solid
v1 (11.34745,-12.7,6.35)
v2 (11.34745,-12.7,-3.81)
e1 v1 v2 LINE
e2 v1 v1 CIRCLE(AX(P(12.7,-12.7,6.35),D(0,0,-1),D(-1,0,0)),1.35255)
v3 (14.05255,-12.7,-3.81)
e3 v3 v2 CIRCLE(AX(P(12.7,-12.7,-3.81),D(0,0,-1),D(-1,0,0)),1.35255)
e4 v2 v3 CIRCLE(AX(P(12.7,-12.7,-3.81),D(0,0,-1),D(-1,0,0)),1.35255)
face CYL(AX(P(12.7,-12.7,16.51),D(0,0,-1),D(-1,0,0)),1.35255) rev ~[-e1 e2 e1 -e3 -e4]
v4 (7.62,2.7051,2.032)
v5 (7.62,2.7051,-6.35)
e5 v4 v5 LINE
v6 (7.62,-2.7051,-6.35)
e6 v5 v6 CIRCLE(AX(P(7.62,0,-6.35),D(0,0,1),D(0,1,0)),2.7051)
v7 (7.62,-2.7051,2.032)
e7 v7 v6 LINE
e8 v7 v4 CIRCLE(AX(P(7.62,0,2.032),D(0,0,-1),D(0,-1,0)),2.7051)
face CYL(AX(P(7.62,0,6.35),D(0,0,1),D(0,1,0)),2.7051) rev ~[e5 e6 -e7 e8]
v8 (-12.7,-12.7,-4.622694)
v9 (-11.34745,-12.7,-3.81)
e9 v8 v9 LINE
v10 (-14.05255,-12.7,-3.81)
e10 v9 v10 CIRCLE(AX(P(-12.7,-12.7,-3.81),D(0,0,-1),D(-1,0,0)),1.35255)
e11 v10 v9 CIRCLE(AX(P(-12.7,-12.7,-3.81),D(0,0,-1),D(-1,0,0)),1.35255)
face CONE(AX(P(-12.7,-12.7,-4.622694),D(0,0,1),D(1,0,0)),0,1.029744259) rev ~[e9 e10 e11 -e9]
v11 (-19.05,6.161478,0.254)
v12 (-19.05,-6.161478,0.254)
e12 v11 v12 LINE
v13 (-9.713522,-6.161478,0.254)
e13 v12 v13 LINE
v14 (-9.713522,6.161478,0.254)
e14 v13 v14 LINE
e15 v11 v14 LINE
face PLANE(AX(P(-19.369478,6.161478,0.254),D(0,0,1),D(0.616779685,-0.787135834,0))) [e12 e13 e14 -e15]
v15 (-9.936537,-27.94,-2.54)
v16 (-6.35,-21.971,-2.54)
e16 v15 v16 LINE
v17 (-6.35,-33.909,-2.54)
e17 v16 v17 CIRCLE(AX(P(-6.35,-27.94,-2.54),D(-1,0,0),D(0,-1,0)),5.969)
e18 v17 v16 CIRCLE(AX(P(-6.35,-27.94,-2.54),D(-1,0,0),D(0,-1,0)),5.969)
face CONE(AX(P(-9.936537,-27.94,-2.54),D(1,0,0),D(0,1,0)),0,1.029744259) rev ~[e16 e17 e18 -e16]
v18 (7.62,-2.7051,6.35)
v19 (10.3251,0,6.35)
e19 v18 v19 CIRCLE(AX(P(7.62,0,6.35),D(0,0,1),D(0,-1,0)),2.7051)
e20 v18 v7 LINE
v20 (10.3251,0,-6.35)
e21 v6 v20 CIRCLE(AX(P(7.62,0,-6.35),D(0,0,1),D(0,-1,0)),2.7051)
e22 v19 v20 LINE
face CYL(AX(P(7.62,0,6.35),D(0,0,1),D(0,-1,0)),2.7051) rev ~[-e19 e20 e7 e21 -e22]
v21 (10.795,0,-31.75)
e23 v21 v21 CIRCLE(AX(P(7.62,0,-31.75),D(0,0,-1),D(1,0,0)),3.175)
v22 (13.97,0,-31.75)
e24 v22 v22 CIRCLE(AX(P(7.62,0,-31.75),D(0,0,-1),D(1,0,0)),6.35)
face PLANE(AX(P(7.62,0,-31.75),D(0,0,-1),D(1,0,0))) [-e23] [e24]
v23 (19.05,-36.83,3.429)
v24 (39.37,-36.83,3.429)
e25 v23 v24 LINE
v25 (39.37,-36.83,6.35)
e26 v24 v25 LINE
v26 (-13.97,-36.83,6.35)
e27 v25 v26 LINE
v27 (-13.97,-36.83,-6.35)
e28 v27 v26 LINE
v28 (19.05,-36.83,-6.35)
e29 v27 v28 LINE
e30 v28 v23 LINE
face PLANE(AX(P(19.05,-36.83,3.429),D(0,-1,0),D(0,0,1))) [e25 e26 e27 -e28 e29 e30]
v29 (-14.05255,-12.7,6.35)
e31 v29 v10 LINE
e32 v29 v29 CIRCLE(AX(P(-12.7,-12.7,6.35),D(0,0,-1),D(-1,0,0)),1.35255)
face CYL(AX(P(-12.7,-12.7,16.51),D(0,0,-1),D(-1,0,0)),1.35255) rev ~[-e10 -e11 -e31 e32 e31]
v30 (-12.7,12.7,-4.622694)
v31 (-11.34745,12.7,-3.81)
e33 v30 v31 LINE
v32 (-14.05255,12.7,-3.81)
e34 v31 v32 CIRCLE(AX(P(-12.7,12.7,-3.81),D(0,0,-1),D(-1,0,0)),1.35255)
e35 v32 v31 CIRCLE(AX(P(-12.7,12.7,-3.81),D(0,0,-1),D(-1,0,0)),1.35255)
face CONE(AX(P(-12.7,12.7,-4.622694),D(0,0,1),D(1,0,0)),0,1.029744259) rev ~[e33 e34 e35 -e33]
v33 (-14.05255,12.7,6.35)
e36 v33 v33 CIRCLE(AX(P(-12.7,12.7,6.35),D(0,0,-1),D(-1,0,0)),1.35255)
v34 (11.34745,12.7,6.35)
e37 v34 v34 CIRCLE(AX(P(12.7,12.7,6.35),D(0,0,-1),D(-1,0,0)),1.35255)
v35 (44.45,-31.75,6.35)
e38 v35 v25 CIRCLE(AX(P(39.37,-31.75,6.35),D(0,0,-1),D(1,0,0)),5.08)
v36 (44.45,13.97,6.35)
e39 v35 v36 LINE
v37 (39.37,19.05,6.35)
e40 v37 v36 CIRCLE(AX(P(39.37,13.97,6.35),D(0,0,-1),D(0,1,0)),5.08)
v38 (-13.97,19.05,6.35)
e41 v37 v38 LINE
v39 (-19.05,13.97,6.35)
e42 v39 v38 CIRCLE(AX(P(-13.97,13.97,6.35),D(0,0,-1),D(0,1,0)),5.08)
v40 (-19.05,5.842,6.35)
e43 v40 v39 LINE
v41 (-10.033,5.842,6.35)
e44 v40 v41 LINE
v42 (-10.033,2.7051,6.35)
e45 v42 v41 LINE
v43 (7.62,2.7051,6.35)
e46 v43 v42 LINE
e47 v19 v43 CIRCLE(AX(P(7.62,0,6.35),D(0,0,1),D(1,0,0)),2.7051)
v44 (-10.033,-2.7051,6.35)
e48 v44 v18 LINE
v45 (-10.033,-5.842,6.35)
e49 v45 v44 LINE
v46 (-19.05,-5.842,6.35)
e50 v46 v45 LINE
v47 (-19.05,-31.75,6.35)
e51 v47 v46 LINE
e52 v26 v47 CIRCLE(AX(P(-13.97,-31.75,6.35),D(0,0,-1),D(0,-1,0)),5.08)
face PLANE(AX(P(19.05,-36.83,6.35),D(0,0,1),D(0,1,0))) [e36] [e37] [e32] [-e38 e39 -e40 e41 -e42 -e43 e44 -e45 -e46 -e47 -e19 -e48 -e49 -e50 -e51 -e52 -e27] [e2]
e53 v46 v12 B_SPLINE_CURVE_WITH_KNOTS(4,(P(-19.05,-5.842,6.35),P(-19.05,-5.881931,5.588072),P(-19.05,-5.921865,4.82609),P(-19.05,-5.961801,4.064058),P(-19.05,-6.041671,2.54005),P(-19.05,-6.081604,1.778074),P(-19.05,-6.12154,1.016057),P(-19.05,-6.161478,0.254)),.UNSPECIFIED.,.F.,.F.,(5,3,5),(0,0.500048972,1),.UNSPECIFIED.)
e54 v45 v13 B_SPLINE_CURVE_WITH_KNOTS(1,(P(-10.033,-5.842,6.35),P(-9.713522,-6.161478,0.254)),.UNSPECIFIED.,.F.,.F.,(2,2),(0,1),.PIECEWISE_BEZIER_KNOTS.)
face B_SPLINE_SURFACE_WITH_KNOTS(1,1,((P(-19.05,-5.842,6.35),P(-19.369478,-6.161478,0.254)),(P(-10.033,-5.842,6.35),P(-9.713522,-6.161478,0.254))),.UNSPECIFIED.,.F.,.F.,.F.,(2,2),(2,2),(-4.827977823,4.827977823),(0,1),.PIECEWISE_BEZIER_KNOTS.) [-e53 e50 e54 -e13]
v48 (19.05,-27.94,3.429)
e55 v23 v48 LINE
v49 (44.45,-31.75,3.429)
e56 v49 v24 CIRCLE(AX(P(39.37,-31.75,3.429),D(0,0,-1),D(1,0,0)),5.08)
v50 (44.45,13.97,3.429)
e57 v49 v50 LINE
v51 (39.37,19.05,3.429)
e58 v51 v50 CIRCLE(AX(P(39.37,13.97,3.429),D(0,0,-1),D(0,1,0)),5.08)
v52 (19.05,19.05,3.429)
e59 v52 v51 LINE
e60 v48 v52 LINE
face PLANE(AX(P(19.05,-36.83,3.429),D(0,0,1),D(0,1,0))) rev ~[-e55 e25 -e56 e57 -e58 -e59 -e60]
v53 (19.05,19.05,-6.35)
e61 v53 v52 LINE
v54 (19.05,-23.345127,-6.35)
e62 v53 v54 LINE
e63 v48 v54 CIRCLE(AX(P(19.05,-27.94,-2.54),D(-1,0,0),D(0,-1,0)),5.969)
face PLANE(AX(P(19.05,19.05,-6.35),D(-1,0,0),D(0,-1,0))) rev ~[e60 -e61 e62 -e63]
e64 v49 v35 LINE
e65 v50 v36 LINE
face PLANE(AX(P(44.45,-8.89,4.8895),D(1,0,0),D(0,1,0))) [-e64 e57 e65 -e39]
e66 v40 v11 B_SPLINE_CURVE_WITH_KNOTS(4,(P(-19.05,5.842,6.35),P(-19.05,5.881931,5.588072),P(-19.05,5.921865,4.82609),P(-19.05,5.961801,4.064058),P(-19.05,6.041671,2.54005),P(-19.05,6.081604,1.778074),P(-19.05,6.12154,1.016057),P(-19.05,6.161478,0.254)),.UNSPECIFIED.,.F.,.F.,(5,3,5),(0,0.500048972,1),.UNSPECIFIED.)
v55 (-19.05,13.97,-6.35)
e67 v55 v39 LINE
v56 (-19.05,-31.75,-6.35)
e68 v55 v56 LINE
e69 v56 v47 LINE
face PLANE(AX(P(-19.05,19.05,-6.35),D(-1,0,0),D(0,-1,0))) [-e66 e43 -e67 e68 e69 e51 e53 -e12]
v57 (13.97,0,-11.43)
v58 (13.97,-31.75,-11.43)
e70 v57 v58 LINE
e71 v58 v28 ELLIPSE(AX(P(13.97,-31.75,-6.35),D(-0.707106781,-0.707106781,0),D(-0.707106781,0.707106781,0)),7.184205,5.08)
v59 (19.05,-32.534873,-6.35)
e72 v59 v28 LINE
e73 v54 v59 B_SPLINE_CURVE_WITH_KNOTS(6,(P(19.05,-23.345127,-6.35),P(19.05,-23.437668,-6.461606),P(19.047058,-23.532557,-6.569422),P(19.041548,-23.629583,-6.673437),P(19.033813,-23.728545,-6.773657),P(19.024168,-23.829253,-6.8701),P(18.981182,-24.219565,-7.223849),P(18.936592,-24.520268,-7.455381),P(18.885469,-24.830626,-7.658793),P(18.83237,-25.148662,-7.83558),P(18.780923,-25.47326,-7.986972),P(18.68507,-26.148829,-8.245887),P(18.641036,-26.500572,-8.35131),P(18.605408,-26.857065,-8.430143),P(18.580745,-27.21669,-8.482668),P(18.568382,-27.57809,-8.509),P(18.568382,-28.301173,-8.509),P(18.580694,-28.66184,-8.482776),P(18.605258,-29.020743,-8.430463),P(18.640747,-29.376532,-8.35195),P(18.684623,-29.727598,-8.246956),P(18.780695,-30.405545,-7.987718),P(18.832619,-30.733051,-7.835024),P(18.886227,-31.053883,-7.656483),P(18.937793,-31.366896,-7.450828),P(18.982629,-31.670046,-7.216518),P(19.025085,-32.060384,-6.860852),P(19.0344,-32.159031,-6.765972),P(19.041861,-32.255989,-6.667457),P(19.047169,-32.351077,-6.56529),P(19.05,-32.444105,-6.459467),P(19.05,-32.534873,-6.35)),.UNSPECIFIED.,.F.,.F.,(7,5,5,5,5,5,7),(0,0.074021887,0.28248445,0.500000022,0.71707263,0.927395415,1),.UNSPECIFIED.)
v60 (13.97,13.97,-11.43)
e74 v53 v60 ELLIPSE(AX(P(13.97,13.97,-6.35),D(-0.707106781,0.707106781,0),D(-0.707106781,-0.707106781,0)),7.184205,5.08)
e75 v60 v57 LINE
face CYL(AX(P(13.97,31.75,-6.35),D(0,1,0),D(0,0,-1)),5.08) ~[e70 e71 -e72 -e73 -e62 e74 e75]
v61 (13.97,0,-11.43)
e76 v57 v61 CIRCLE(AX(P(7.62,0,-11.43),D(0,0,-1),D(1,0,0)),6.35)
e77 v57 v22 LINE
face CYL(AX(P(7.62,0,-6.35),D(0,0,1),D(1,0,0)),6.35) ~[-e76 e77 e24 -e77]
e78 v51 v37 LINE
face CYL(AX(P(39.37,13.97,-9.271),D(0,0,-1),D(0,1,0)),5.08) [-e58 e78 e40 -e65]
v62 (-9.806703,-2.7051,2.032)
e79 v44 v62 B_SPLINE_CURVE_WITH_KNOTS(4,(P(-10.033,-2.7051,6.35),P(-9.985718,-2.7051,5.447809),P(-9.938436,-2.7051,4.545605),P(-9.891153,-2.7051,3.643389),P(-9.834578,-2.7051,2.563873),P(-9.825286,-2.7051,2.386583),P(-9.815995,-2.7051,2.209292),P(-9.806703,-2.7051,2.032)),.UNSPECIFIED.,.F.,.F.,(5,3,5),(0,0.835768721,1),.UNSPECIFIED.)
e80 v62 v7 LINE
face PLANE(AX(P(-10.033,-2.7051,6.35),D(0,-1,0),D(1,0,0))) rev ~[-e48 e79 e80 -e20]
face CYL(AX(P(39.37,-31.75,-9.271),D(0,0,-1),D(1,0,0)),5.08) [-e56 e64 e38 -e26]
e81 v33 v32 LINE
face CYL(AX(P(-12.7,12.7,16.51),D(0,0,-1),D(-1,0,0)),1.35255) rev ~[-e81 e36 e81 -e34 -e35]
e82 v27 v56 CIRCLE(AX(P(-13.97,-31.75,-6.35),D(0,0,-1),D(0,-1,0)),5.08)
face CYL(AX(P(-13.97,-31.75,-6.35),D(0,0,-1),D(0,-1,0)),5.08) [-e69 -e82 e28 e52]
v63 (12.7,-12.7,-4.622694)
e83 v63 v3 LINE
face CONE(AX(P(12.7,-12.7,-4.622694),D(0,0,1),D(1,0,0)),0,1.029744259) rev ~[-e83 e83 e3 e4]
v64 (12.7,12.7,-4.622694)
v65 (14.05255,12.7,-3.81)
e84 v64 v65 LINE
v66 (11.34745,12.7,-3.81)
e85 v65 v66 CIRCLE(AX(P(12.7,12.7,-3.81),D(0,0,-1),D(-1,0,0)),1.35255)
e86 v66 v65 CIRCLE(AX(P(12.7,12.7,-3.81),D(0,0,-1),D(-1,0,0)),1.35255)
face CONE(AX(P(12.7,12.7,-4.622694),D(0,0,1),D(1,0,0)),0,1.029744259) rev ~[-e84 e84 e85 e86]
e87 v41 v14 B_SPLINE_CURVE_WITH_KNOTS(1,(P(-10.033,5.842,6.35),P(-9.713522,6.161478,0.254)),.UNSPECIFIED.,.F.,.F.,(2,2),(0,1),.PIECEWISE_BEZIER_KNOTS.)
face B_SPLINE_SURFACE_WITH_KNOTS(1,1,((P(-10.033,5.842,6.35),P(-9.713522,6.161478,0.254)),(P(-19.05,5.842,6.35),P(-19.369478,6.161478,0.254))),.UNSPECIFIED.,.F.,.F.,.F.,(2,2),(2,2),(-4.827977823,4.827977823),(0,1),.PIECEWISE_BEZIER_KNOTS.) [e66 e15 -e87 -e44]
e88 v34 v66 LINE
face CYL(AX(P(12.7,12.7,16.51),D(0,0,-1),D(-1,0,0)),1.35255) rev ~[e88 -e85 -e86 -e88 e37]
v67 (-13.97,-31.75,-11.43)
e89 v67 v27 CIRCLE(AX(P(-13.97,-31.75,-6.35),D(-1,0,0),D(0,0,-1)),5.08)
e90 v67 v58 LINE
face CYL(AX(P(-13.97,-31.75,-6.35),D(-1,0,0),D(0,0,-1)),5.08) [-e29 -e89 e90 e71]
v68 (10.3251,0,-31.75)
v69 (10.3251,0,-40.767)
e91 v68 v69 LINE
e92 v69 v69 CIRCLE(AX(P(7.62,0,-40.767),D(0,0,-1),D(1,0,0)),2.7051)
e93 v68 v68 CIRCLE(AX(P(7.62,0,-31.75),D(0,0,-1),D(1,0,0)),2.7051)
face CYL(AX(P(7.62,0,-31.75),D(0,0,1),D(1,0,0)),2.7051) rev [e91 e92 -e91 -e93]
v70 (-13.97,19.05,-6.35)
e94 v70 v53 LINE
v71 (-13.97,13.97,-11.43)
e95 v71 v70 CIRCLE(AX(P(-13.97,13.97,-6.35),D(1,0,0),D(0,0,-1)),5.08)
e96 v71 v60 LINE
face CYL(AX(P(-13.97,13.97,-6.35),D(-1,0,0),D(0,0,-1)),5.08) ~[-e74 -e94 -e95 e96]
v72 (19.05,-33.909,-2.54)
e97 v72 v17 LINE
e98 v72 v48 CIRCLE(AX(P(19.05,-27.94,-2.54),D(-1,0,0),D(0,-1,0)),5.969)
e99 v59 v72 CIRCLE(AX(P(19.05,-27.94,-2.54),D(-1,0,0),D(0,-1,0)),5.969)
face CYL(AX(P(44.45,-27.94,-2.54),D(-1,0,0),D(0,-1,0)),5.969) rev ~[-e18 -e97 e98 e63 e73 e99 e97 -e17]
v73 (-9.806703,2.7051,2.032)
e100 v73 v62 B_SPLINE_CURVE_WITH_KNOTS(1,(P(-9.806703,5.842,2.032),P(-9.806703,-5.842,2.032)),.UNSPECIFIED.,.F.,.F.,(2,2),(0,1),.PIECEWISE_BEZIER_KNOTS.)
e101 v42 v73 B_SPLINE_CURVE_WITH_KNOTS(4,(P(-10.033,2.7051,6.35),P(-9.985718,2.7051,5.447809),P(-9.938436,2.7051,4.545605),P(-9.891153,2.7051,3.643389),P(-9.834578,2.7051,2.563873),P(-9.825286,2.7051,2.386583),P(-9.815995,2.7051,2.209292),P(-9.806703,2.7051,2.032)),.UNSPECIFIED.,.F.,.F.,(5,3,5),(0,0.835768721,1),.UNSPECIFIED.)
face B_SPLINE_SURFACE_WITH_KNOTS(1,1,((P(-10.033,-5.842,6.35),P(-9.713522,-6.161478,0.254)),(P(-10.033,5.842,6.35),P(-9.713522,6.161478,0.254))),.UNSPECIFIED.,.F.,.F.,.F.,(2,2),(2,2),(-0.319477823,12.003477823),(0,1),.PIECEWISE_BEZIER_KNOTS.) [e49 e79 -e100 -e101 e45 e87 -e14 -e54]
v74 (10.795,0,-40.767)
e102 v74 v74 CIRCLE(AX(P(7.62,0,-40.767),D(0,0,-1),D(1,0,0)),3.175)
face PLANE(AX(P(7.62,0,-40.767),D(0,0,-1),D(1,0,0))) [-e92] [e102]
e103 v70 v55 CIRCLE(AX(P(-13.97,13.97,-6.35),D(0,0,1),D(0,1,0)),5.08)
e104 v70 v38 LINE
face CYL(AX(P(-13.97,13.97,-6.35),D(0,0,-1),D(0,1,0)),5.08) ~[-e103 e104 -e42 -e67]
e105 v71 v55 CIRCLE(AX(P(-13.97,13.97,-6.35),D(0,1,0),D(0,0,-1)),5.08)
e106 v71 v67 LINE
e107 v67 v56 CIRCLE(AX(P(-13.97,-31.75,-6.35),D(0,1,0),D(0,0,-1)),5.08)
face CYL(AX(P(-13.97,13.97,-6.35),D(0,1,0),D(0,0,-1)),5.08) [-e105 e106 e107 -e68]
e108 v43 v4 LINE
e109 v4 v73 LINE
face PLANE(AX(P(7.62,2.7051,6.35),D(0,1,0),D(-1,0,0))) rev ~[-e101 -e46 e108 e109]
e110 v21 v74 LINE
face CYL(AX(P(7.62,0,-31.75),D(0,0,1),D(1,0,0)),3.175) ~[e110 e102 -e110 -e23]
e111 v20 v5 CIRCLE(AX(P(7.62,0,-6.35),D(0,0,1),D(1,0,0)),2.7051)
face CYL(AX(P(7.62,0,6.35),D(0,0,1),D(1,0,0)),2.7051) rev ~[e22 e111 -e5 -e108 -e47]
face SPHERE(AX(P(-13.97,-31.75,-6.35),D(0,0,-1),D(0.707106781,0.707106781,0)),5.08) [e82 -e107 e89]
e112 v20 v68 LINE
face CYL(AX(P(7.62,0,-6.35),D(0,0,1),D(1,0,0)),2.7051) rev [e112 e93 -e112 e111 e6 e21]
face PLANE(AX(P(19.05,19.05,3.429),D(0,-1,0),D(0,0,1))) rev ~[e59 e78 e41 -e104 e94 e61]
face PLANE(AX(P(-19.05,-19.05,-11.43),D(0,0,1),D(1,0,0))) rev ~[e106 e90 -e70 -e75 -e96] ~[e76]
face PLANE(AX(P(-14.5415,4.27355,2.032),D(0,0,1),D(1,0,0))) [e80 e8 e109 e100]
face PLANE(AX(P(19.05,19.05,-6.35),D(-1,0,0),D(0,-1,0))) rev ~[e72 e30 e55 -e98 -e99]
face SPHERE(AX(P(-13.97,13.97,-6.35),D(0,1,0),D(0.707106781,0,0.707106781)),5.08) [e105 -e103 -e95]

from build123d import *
from build123d import SkipClean  # not in build123d's __all__

# Parameters (mm, degrees)
F0_W          = 38.1
F0_H          = 12.7
F1_DEPTH      = 19.05
F2_W          = 9.017
F2_H          = 3.1369
F2_H_2        = 5.4102
F3_DEPTH      = 6.096
F3_TAPER      = -3
F4_DEPTH      = 4.318
F5_DEPTH      = 12.7010001
F7_R          = 6.35
F7_R_2        = 2.7051
F8_DEPTH      = 25.4
F9_R          = 3.175
F9_R_2        = 2.7051
F10_DEPTH     = 9.017
F11_DEPTH     = 17.78
F12_DEPTH     = 5.08
F14_D         = 11.938
F14_DEPTH     = 25.4
F14_TIP       = 3.586537035
F15_W         = 55.88
F15_H         = 2.921
F16_DEPTH     = 25.4
F17_T1_DEPTH  = 25.4
F17_T3_DEPTH  = 28.321
F17_T5_DEPTH  = 45.72
F17_T7_DEPTH  = 45.72
F17_T9_DEPTH  = 81.28
F17_S13_W     = 5.08
F17_S13_H     = 5.08
F17_T14_DEPTH = 5.08
F17_S19_W     = 5.08
F17_S19_H     = 5.08
F17_T20_DEPTH = 5.08
F18_D         = 2.7051
F18_DEPTH     = 10.16
F18_TIP       = 0.8126940303


# Not quite as in the source:
# - a fillet or chamfer that OpenCascade refuses, or shapes differently, is made with other operations: its cross-section is extruded or revolved along the edge and cut away or added
# - after a boolean that leaves OpenCascade's solid faulty, fix() repairs it


with BuildPart() as f1:
    # F0 (on Front) → F1 (new body, symmetric)
    with BuildSketch(Plane.XZ):
        Rectangle(F0_W, F0_H)
    extrude(amount=F1_DEPTH, both=True)

    # F2 (on face) → F3 (cut)
    with BuildSketch(Plane.XY.offset(6.35)):
        with Locations((-14.5415, 4.27355)):
            Rectangle(F2_W, F2_H)
        with Locations((-14.5415, 0)):
            Rectangle(F2_W, F2_H_2)
        with Locations((-14.5415, -4.27355)):
            Rectangle(F2_W, F2_H)
    extrude(amount=-F3_DEPTH, taper=F3_TAPER, mode=Mode.SUBTRACT)

    # F2 (on face) → F4 (cut)
    with BuildSketch(Plane.XY.offset(6.35)):
        with Locations((-14.5415, 4.27355)):
            Rectangle(F2_W, F2_H)
        with Locations((-14.5415, -4.27355)):
            Rectangle(F2_W, F2_H)
        with BuildLine():
            Line((7.62, 2.7051), (1.8750079208, 2.7051))
            ThreePointArc((1.8750079208, 2.7051), (1.27, 0), (1.8750079208, -2.7051))
            Line((1.8750079208, -2.7051), (7.62, -2.7051))
            ThreePointArc((7.62, -2.7051), (4.9149, 0), (7.62, 2.7051))
        make_face()
        with BuildLine():
            ThreePointArc((1.8750079208, -2.7051), (1.27, 0), (1.8750079208, 2.7051))
            Line((1.8750079208, 2.7051), (-10.033, 2.7051))
            Line((-10.033, 2.7051), (-10.033, -2.7051))
            Line((-10.033, -2.7051), (1.8750079208, -2.7051))
        make_face()
        with Locations((-14.5415, 0)):
            Rectangle(F2_W, F2_H_2)
    extrude(amount=-F4_DEPTH, mode=Mode.SUBTRACT)

    # F2 (on face) → F5 (cut, through all)
    with BuildSketch(Plane.XY.offset(6.35)):
        with BuildLine():
            ThreePointArc((10.3251, 0), (9.5327945538, 1.9127945538), (7.62, 2.7051))
            ThreePointArc((7.62, 2.7051), (4.9149, 0), (7.62, -2.7051))
            ThreePointArc((7.62, -2.7051), (9.5327945538, -1.9127945538), (10.3251, 0))
        make_face()
    extrude(amount=-F5_DEPTH, mode=Mode.SUBTRACT)

    # F7 (on face) → F8 (join)
    with BuildSketch(Plane(origin=(0, 0, -6.35), x_dir=(1, 0, 0), z_dir=(0, 0, -1))):
        with Locations((7.62, 0)):
            Circle(F7_R)
        with Locations((7.62, 0)):
            Circle(F7_R_2, mode=Mode.SUBTRACT)
    with SkipClean():  # cleaning this boolean's faces spoils the solid; the shape is the same uncleaned
        extrude(amount=F8_DEPTH)

    # F9 (on face) → F10 (join)
    with BuildSketch(Plane(origin=(0, 0, -31.75), x_dir=(1, 0, 0), z_dir=(0, 0, -1))):
        with Locations((7.62, 0)):
            Circle(F9_R)
        with Locations((7.62, 0)):
            Circle(F9_R_2, mode=Mode.SUBTRACT)
    extrude(amount=F10_DEPTH)

    add(f1.part.fix(), mode=Mode.REPLACE)

    # F11 (add): a face of the model
    f11_faces = [f1.faces().sort_by_distance(p)[0] for p in [
        (0, -19.05, 0),
    ]]
    extrude(f11_faces, amount=F11_DEPTH)

    # F12 (add): faces of the model
    f12_faces = [f1.faces().sort_by_distance(p)[0] for p in [
        (-0.7285482759, 0, -6.35),
        (0, -27.94, -6.35),
    ]]
    extrude(f12_faces, amount=F12_DEPTH)

    # F14
    with Locations(Plane.YZ.offset(19.05)):
        with Locations((-27.94, -2.54)):
            Hole(F14_D / 2, depth=F14_DEPTH)
            with Locations((0, 0, -(F14_DEPTH + F14_TIP / 2))):  # 118° drill point
                Cone(0, F14_D / 2, F14_TIP, mode=Mode.SUBTRACT)

    # F15 (on face) → F16 (join)
    with BuildSketch(Plane.YZ.offset(19.05)):
        with Locations((-8.89, 4.8895)):
            Rectangle(F15_W, F15_H)
    extrude(amount=F16_DEPTH)

    # F17: fillet of radius 5.08 on 8 edges, made by hand

    # F17_s2 → F17_t1 (cut)
    with BuildSketch(Plane.XY.offset(-6.35)):
        with BuildLine():
            ThreePointArc((-13.97, -36.83), (-17.5621024484, -35.3421024484), (-19.05, -31.75))
            Line((-19.05, -31.75), (-19.05, -36.83))
            Line((-19.05, -36.83), (-13.97, -36.83))
        make_face()
        with BuildLine():
            ThreePointArc((-13.97, 19.05), (-17.5621024484, 17.5621024484), (-19.05, 13.97))
            Line((-19.05, 13.97), (-19.05, 19.05))
            Line((-19.05, 19.05), (-13.97, 19.05))
        make_face()
    extrude(amount=F17_T1_DEPTH, mode=Mode.SUBTRACT)

    # F17_s4 → F17_t3 (cut)
    with BuildSketch(Plane.XY.offset(-9.271)):
        with BuildLine():
            ThreePointArc((39.37, 19.05), (42.9621024484, 17.5621024484), (44.45, 13.97))
            Line((44.45, 13.97), (44.45, 19.05))
            Line((44.45, 19.05), (39.37, 19.05))
        make_face()
        with BuildLine():
            ThreePointArc((44.45, -31.75), (42.9621024484, -35.3421024484), (39.37, -36.83))
            Line((39.37, -36.83), (44.45, -36.83))
            Line((44.45, -36.83), (44.45, -31.75))
        make_face()
    extrude(amount=F17_T3_DEPTH, mode=Mode.SUBTRACT)

    # F17_s6 → F17_t5 (cut)
    with BuildSketch(Plane.XZ.offset(-13.97)):
        with BuildLine():
            ThreePointArc((-13.97, -11.43), (-17.5621024484, -9.9421024484), (-19.05, -6.35))
            Line((-19.05, -6.35), (-19.05, -11.43))
            Line((-19.05, -11.43), (-13.97, -11.43))
        make_face()
    extrude(amount=F17_T5_DEPTH, mode=Mode.SUBTRACT)

    # F17_s8 → F17_t7 (cut)
    with BuildSketch(Plane.YZ.offset(-13.97)):
        with BuildLine():
            ThreePointArc((-31.75, -11.43), (-35.3421024484, -9.9421024484), (-36.83, -6.35))
            Line((-36.83, -6.35), (-36.83, -11.43))
            Line((-36.83, -11.43), (-31.75, -11.43))
        make_face()
        with BuildLine():
            ThreePointArc((13.97, -11.43), (17.5621024484, -9.9421024484), (19.05, -6.35))
            Line((19.05, -6.35), (19.05, -11.43))
            Line((19.05, -11.43), (13.97, -11.43))
        make_face()
    extrude(amount=F17_T7_DEPTH, mode=Mode.SUBTRACT)

    # F17_s10 → F17_t9 (cut)
    with BuildSketch(Plane.XZ.offset(-31.75)):
        with BuildLine():
            ThreePointArc((13.97, -11.43), (17.5621024484, -9.9421024484), (19.05, -6.35))
            Line((19.05, -6.35), (19.05, -11.43))
            Line((19.05, -11.43), (13.97, -11.43))
        make_face()
    extrude(amount=F17_T9_DEPTH, mode=Mode.SUBTRACT)


with BuildPart() as f17_tool12:
    # F17_s13 → F17_t14 (new body)
    with BuildSketch(Plane.XY.offset(-6.35)):
        with Locations((-16.51, -34.29)):
            Rectangle(F17_S13_W, F17_S13_H)
    extrude(amount=-F17_T14_DEPTH)

    # F17_s15 → F17_t16 (revolve, cut)
    with BuildSketch(Plane(origin=(-13.97, -31.75, -6.35), x_dir=(0.7071067812, 0.7071067812, 0), z_dir=(-0.7071067812, 0.7071067812, 0))):
        with BuildLine():
            ThreePointArc((0, -5.08), (5.08, 0), (0, 5.08))
            Line((0, 5.08), (0, -5.08))
        make_face()
    revolve(axis=Axis((-13.97, -31.75, -6.35), (0, 0, -1)), mode=Mode.SUBTRACT)


with BuildPart() as f1_1:
    add(f1.part, clean=False)

    # F17_t11: cut F17_tool12
    add(f17_tool12.part, mode=Mode.SUBTRACT)


with BuildPart() as f17_tool18:
    # F17_s19 → F17_t20 (new body)
    with BuildSketch(Plane.XZ.offset(-13.97)):
        with Locations((-16.51, -8.89)):
            Rectangle(F17_S19_W, F17_S19_H)
    extrude(amount=-F17_T20_DEPTH)

    # F17_s21 → F17_t22 (revolve, cut)
    with BuildSketch(Plane(origin=(-13.97, 13.97, -6.35), x_dir=(0.7071067812, 0, 0.7071067812), z_dir=(-0.7071067812, 0, 0.7071067812))):
        with BuildLine():
            ThreePointArc((0, -5.08), (5.08, 0), (0, 5.08))
            Line((0, 5.08), (0, -5.08))
        make_face()
    revolve(axis=Axis((-13.97, 13.97, -6.35), (0, 1, 0)), mode=Mode.SUBTRACT)


with BuildPart() as f1_2:
    add(f1_1.part, clean=False)

    # F17_t17: cut F17_tool18
    add(f17_tool18.part, mode=Mode.SUBTRACT)

    # F18
    with Locations(Plane.XY.offset(6.35)):
        with Locations((-12.7, 12.7), (-12.7, -12.7), (12.7, -12.7), (12.7, 12.7)):
            Hole(F18_D / 2, depth=F18_DEPTH)
            with Locations((0, 0, -(F18_DEPTH + F18_TIP / 2))):  # 118° drill point
                Cone(0, F18_D / 2, F18_TIP, mode=Mode.SUBTRACT)


solid = f1_2.part
